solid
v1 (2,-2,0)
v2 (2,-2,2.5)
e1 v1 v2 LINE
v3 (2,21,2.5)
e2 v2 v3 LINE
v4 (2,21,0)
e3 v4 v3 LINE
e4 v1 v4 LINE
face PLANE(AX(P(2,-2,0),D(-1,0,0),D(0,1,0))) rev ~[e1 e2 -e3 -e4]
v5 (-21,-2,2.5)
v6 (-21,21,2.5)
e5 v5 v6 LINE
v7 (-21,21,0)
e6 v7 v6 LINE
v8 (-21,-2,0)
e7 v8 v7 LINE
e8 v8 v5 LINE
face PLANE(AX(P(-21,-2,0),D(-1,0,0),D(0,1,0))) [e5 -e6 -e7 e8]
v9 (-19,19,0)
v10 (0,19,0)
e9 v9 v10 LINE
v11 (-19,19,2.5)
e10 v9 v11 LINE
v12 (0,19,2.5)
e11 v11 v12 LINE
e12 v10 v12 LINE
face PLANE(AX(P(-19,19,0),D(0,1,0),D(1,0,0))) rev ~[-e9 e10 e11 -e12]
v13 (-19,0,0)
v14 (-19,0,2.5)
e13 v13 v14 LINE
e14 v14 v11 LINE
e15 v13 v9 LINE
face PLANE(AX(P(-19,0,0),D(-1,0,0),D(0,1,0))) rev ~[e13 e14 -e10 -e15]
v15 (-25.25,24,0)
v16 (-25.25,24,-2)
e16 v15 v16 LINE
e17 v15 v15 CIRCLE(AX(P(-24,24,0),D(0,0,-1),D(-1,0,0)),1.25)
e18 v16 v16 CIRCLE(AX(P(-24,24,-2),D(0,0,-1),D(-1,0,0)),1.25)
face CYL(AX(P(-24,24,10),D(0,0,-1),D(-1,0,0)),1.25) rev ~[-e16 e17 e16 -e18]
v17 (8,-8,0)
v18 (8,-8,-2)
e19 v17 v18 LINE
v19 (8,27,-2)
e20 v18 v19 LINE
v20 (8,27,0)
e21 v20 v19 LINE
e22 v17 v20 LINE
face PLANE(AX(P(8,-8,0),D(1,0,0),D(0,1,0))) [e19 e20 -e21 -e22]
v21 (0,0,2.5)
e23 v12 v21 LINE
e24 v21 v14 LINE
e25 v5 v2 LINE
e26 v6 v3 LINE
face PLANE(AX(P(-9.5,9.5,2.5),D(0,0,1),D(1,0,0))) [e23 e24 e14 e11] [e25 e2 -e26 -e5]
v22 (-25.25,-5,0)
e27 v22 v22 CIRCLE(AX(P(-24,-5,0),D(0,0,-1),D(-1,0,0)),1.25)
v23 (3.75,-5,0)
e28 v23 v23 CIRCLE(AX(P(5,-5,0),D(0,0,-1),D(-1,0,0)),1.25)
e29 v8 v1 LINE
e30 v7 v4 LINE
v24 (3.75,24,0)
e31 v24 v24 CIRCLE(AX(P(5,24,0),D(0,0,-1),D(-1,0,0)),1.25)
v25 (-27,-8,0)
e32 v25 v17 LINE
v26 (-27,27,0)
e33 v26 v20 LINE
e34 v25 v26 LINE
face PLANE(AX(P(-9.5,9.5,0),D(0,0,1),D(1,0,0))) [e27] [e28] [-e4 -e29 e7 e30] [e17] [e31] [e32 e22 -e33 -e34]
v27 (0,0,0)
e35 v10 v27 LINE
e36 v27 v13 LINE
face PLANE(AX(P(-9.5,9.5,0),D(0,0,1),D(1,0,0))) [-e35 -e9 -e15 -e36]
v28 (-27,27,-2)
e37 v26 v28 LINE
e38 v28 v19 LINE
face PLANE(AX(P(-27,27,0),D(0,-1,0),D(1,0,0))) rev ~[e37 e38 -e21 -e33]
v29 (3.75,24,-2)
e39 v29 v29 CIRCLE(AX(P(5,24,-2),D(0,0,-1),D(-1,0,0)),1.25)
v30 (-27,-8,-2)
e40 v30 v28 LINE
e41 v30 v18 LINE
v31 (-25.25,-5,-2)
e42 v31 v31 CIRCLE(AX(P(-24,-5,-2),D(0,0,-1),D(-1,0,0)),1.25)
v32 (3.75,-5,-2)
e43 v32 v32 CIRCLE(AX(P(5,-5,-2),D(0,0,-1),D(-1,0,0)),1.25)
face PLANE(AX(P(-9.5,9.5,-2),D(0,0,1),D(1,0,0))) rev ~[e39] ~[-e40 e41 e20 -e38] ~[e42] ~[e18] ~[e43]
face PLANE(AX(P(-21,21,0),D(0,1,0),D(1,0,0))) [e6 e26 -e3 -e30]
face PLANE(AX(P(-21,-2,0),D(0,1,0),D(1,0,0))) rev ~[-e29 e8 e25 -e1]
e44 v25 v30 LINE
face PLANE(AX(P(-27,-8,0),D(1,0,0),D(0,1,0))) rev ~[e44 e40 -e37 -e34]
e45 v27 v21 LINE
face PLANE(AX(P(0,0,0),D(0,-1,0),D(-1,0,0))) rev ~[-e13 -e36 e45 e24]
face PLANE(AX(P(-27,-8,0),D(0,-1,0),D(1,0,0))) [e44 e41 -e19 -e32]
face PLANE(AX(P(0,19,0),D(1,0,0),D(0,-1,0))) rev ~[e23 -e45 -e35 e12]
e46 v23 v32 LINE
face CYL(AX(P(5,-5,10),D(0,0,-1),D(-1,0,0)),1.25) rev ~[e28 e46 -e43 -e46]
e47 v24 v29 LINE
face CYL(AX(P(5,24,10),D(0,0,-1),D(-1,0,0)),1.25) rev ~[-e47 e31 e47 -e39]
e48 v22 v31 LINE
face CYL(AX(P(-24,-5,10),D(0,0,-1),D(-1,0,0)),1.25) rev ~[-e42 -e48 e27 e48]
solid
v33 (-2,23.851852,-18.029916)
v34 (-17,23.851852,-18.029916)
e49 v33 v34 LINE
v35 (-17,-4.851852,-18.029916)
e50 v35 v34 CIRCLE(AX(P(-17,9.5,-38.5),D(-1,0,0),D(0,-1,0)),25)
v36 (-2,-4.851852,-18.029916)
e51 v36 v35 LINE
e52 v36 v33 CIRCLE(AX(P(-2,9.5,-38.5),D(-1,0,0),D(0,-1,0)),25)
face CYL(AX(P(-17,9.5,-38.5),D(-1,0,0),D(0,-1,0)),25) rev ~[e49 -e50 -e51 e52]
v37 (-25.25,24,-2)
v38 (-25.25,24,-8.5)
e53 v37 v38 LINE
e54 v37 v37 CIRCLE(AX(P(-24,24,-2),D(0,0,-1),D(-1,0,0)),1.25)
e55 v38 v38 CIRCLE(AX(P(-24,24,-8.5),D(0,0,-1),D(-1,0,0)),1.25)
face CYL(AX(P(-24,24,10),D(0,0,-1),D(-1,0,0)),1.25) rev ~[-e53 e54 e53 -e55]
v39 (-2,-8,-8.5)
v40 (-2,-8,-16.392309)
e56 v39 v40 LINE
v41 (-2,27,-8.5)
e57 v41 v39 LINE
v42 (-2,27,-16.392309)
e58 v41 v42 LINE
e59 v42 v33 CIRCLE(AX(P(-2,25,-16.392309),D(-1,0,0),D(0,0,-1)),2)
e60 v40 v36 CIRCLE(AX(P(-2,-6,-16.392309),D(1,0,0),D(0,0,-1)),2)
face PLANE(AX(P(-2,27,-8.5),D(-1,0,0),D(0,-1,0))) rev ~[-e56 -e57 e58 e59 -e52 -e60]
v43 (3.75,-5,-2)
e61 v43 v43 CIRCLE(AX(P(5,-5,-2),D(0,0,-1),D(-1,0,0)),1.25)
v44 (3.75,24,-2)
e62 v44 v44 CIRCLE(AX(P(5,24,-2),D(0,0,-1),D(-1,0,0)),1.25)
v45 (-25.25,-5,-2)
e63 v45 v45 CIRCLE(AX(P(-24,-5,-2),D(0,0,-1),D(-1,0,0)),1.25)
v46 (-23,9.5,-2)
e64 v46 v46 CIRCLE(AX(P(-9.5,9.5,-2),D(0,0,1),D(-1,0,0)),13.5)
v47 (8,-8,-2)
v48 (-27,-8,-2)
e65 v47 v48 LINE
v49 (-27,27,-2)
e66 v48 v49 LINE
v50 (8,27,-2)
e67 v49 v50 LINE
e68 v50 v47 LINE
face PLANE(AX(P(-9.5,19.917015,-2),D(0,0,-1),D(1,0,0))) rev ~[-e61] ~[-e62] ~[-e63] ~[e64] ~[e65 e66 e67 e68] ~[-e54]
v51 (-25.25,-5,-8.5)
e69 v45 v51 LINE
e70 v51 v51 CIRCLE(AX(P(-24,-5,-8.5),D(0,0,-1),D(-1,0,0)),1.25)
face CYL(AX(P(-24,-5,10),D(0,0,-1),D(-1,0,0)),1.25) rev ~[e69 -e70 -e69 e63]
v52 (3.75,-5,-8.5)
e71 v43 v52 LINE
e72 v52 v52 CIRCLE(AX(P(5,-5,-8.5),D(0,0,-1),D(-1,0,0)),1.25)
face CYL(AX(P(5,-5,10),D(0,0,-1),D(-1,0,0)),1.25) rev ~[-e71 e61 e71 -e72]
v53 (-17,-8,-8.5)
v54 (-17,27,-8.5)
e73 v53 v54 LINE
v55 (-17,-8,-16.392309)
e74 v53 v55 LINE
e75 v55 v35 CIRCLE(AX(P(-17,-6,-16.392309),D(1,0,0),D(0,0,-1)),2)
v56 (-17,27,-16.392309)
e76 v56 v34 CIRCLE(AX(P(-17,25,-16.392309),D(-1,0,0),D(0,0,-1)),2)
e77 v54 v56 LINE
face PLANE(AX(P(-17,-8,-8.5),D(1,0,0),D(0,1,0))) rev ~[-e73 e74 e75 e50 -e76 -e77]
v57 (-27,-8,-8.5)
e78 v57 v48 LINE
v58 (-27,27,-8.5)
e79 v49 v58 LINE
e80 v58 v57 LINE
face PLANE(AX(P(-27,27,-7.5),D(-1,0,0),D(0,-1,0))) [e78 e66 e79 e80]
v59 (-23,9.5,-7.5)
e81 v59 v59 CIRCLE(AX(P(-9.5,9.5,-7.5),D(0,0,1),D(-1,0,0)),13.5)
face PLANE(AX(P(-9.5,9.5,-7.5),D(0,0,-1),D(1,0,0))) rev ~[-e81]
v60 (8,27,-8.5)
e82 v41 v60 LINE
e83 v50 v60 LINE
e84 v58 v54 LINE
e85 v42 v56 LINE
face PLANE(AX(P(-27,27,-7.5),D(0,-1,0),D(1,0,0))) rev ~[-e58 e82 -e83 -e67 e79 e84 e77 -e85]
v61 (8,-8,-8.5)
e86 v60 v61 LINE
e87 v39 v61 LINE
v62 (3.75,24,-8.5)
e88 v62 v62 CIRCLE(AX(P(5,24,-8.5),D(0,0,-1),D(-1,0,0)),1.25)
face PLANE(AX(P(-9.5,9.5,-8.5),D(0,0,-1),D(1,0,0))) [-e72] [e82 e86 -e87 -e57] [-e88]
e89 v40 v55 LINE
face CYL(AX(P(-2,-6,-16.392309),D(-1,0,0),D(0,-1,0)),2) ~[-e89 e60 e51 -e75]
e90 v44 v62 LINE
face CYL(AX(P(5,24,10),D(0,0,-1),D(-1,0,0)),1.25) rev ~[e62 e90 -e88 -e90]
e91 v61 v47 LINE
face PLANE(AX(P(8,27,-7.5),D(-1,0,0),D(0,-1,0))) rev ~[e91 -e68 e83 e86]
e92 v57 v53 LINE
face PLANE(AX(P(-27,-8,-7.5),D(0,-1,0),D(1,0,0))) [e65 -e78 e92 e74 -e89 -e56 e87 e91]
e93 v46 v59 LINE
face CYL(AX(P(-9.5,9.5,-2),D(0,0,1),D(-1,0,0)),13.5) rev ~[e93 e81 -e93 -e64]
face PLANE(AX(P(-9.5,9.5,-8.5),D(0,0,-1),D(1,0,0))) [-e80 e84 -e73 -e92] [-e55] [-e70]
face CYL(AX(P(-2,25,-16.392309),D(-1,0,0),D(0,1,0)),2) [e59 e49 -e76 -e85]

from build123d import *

# Parameters (mm, degrees)
F0_W       = 35
F0_H       = 35
F0_W_2     = 23
F0_H_2     = 23
F1_DEPTH   = 2
F3_DEPTH   = 5.5
F4_DEPTH   = 2.5
F5_DEPTH   = 1
F7_W       = 35
F7_H       = 35
F7_R       = 13.5
F8_DEPTH   = 1
F9_D       = 2.5
F9_DEPTH   = 10
F9_TIP     = 0.7510757738
F9_2_D     = 2.5
F9_2_DEPTH = 10
F9_2_TIP   = 0.7510757738
F10_W      = 7.5
F10_H      = 17.5
F11_DEPTH  = 25
F12_R      = 25
F13_DEPTH  = 25
F14_R      = 2


with BuildPart() as f1:
    # F0 (on Top) → F1 (new body)
    with BuildSketch(Plane.XY):
        with Locations((-9.5, 9.5)):
            Rectangle(F0_W, F0_H)
        with Locations((-9.5, 9.5)):
            Rectangle(F0_W_2, F0_H_2, mode=Mode.SUBTRACT)
        with Locations((-9.5, 9.5)):
            Rectangle(F0_W_2, F0_H_2)
        with BuildLine():
            Line((0, 5.027864045), (0, 0))
            Line((0, 0), (-5.027864045, 0))
            ThreePointArc((-5.027864045, 0), (-9.5, -1), (-13.972135955, 0))
            Line((-13.972135955, 0), (-19, 0))
            Line((-19, 0), (-19, 5.027864045))
            ThreePointArc((-19, 5.027864045), (-20, 9.5), (-19, 13.972135955))
            Line((-19, 13.972135955), (-19, 19))
            Line((-19, 19), (-13.972135955, 19))
            ThreePointArc((-13.972135955, 19), (-9.5, 20), (-5.027864045, 19))
            Line((-5.027864045, 19), (0, 19))
            Line((0, 19), (0, 13.972135955))
            ThreePointArc((0, 13.972135955), (0.746950766, 11.7912878475), (1, 9.5))
            ThreePointArc((1, 9.5), (0.746950766, 7.2087121525), (0, 5.027864045))
        make_face(mode=Mode.SUBTRACT)
        with BuildLine():
            Line((-13.972135955, 0), (-5.027864045, 0))
            ThreePointArc((-5.027864045, 0), (-2.0753787975, 2.0753787975), (0, 5.027864045))
            Line((0, 5.027864045), (0, 13.972135955))
            ThreePointArc((0, 13.972135955), (-2.0753787975, 16.9246212025), (-5.027864045, 19))
            Line((-5.027864045, 19), (-13.972135955, 19))
            ThreePointArc((-13.972135955, 19), (-16.9246212025, 16.9246212025), (-19, 13.972135955))
            Line((-19, 13.972135955), (-19, 5.027864045))
            ThreePointArc((-19, 5.027864045), (-16.9246212025, 2.0753787975), (-13.972135955, 0))
        make_face()
        with BuildLine():
            Line((-19, 19), (-19, 13.972135955))
            ThreePointArc((-19, 13.972135955), (-16.9246212025, 16.9246212025), (-13.972135955, 19))
            Line((-13.972135955, 19), (-19, 19))
        make_face()
        with BuildLine():
            ThreePointArc((-5.027864045, 19), (-2.0753787975, 16.9246212025), (0, 13.972135955))
            Line((0, 13.972135955), (0, 19))
            Line((0, 19), (-5.027864045, 19))
        make_face()
        with BuildLine():
            Line((-5.027864045, 0), (0, 0))
            Line((0, 0), (0, 5.027864045))
            ThreePointArc((0, 5.027864045), (-2.0753787975, 2.0753787975), (-5.027864045, 0))
        make_face()
        with BuildLine():
            Line((-19, 0), (-13.972135955, 0))
            ThreePointArc((-13.972135955, 0), (-16.9246212025, 2.0753787975), (-19, 5.027864045))
            Line((-19, 5.027864045), (-19, 0))
        make_face()
        with BuildLine():
            Line((0, 13.972135955), (0, 5.027864045))
            ThreePointArc((0, 5.027864045), (0.746950766, 7.2087121525), (1, 9.5))
            ThreePointArc((1, 9.5), (0.746950766, 11.7912878475), (0, 13.972135955))
        make_face()
        with BuildLine():
            ThreePointArc((-13.972135955, 0), (-9.5, -1), (-5.027864045, 0))
            Line((-5.027864045, 0), (-13.972135955, 0))
        make_face()
        with BuildLine():
            ThreePointArc((-19, 13.972135955), (-20, 9.5), (-19, 5.027864045))
            Line((-19, 5.027864045), (-19, 13.972135955))
        make_face()
        with BuildLine():
            Line((-13.972135955, 19), (-5.027864045, 19))
            ThreePointArc((-5.027864045, 19), (-9.5, 20), (-13.972135955, 19))
        make_face()
    extrude(amount=-F1_DEPTH)

    # F0 (on Top) → F4 (join)
    with BuildSketch(Plane.XY):
        with Locations((-9.5, 9.5)):
            Rectangle(F0_W_2, F0_H_2)
        with BuildLine():
            Line((0, 5.027864045), (0, 0))
            Line((0, 0), (-5.027864045, 0))
            ThreePointArc((-5.027864045, 0), (-9.5, -1), (-13.972135955, 0))
            Line((-13.972135955, 0), (-19, 0))
            Line((-19, 0), (-19, 5.027864045))
            ThreePointArc((-19, 5.027864045), (-20, 9.5), (-19, 13.972135955))
            Line((-19, 13.972135955), (-19, 19))
            Line((-19, 19), (-13.972135955, 19))
            ThreePointArc((-13.972135955, 19), (-9.5, 20), (-5.027864045, 19))
            Line((-5.027864045, 19), (0, 19))
            Line((0, 19), (0, 13.972135955))
            ThreePointArc((0, 13.972135955), (0.746950766, 11.7912878475), (1, 9.5))
            ThreePointArc((1, 9.5), (0.746950766, 7.2087121525), (0, 5.027864045))
        make_face(mode=Mode.SUBTRACT)
        with BuildLine():
            ThreePointArc((-19, 13.972135955), (-20, 9.5), (-19, 5.027864045))
            Line((-19, 5.027864045), (-19, 13.972135955))
        make_face()
        with BuildLine():
            Line((-13.972135955, 19), (-5.027864045, 19))
            ThreePointArc((-5.027864045, 19), (-9.5, 20), (-13.972135955, 19))
        make_face()
        with BuildLine():
            Line((0, 13.972135955), (0, 5.027864045))
            ThreePointArc((0, 5.027864045), (0.746950766, 7.2087121525), (1, 9.5))
            ThreePointArc((1, 9.5), (0.746950766, 11.7912878475), (0, 13.972135955))
        make_face()
        with BuildLine():
            ThreePointArc((-13.972135955, 0), (-9.5, -1), (-5.027864045, 0))
            Line((-5.027864045, 0), (-13.972135955, 0))
        make_face()
    extrude(amount=F4_DEPTH)


with BuildPart() as f3:
    # F2 (on face) → F3 (new body)
    with BuildSketch(Plane(origin=(0, 0, -2), x_dir=(1, 0, 0), z_dir=(0, 0, -1))):
        with BuildLine():
            Line((-27, -9.5), (-27, -27))
            Line((-27, -27), (8, -27))
            Line((8, -27), (8, -9.5))
            Line((8, -9.5), (4, -9.5))
            ThreePointArc((4, -9.5), (-9.5, -23), (-23, -9.5))
            Line((-23, -9.5), (-27, -9.5))
        make_face()
        with BuildLine():
            Line((-27, 8), (-27, -9.5))
            Line((-27, -9.5), (-23, -9.5))
            ThreePointArc((-23, -9.5), (-9.5, 4), (4, -9.5))
            Line((4, -9.5), (8, -9.5))
            Line((8, -9.5), (8, 8))
            Line((8, 8), (-27, 8))
        make_face()
    extrude(amount=F3_DEPTH)


with BuildPart() as f5:
    # F5 (new): a face of the model
    f5_faces = [f3.part.faces().sort_by_distance(p)[0] for p in [
        (-9.5, 26.5050252532, -7.5),
    ]]
    extrude(f5_faces, amount=F5_DEPTH)


with BuildPart() as f5b:
    # F5#2 (new): a face of the model
    f5_2_faces = [f1.part.faces().sort_by_distance(p)[0] for p in [
        (-9.5, 9.5, -2),
    ]]
    extrude(f5_2_faces, amount=F5_DEPTH)


with BuildPart() as f3_1:
    add(f3.part)

    # F7 (on face) → F8 (join)
    with BuildSketch(Plane(origin=(0, 0, -7.5), x_dir=(1, 0, 0), z_dir=(0, 0, -1))):
        with Locations((-9.5, -9.5)):
            Rectangle(F7_W, F7_H)
        with Locations((-9.5, -9.5)):
            Circle(F7_R, mode=Mode.SUBTRACT)
        with Locations((-9.5, -9.5)):
            Circle(F7_R)
    extrude(amount=F8_DEPTH)

    # F9#2
    with Locations(Plane.XY):
        with Locations((-24, -5), (-24, 24), (5, 24), (5, -5)):
            Hole(F9_2_D / 2, depth=F9_2_DEPTH)
            with Locations((0, 0, -(F9_2_DEPTH + F9_2_TIP / 2))):  # 118° drill point
                Cone(0, F9_2_D / 2, F9_2_TIP, mode=Mode.SUBTRACT)

    # F10 (on face) → F11 (join)
    with BuildSketch(Plane(origin=(0, 0, -8.5), x_dir=(1, 0, 0), z_dir=(0, 0, -1))):
        with Locations((-13.25, -0.75)):
            Rectangle(F10_W, F10_H)
        with Locations((-13.25, -18.25)):
            Rectangle(F10_W, F10_H)
        Polygon((-2, 8), (-9.5, 8), (-9.5, -9.5), (-9.5, -27), (-2, -27), (-2, -9.5), align=None)
    extrude(amount=F11_DEPTH)

    # F12 (on face) → F13 (cut)
    with BuildSketch(Plane(origin=(-17, 0, 0), x_dir=(0, -1, 0), z_dir=(-1, 0, 0))):
        with Locations((-9.5, -38.5)):
            Circle(F12_R)
    extrude(amount=-F13_DEPTH, mode=Mode.SUBTRACT)

    # F14
    f14_edges = [f3_1.edges().sort_by_distance(p)[0] for p in [
        (-9.5, -8, -20.646429),
        (-9.5, 27, -20.646429),
    ]]
    fillet(f14_edges, radius=F14_R)


with BuildPart() as f1_1:
    add(f1.part)

    # F9
    with Locations(Plane.XY):
        with Locations((-24, -5), (-24, 24), (5, 24), (5, -5)):
            Hole(F9_D / 2, depth=F9_DEPTH)
            with Locations((0, 0, -(F9_DEPTH + F9_TIP / 2))):  # 118° drill point
                Cone(0, F9_D / 2, F9_TIP, mode=Mode.SUBTRACT)


solid = Compound([f3_1.part, f1_1.part])
